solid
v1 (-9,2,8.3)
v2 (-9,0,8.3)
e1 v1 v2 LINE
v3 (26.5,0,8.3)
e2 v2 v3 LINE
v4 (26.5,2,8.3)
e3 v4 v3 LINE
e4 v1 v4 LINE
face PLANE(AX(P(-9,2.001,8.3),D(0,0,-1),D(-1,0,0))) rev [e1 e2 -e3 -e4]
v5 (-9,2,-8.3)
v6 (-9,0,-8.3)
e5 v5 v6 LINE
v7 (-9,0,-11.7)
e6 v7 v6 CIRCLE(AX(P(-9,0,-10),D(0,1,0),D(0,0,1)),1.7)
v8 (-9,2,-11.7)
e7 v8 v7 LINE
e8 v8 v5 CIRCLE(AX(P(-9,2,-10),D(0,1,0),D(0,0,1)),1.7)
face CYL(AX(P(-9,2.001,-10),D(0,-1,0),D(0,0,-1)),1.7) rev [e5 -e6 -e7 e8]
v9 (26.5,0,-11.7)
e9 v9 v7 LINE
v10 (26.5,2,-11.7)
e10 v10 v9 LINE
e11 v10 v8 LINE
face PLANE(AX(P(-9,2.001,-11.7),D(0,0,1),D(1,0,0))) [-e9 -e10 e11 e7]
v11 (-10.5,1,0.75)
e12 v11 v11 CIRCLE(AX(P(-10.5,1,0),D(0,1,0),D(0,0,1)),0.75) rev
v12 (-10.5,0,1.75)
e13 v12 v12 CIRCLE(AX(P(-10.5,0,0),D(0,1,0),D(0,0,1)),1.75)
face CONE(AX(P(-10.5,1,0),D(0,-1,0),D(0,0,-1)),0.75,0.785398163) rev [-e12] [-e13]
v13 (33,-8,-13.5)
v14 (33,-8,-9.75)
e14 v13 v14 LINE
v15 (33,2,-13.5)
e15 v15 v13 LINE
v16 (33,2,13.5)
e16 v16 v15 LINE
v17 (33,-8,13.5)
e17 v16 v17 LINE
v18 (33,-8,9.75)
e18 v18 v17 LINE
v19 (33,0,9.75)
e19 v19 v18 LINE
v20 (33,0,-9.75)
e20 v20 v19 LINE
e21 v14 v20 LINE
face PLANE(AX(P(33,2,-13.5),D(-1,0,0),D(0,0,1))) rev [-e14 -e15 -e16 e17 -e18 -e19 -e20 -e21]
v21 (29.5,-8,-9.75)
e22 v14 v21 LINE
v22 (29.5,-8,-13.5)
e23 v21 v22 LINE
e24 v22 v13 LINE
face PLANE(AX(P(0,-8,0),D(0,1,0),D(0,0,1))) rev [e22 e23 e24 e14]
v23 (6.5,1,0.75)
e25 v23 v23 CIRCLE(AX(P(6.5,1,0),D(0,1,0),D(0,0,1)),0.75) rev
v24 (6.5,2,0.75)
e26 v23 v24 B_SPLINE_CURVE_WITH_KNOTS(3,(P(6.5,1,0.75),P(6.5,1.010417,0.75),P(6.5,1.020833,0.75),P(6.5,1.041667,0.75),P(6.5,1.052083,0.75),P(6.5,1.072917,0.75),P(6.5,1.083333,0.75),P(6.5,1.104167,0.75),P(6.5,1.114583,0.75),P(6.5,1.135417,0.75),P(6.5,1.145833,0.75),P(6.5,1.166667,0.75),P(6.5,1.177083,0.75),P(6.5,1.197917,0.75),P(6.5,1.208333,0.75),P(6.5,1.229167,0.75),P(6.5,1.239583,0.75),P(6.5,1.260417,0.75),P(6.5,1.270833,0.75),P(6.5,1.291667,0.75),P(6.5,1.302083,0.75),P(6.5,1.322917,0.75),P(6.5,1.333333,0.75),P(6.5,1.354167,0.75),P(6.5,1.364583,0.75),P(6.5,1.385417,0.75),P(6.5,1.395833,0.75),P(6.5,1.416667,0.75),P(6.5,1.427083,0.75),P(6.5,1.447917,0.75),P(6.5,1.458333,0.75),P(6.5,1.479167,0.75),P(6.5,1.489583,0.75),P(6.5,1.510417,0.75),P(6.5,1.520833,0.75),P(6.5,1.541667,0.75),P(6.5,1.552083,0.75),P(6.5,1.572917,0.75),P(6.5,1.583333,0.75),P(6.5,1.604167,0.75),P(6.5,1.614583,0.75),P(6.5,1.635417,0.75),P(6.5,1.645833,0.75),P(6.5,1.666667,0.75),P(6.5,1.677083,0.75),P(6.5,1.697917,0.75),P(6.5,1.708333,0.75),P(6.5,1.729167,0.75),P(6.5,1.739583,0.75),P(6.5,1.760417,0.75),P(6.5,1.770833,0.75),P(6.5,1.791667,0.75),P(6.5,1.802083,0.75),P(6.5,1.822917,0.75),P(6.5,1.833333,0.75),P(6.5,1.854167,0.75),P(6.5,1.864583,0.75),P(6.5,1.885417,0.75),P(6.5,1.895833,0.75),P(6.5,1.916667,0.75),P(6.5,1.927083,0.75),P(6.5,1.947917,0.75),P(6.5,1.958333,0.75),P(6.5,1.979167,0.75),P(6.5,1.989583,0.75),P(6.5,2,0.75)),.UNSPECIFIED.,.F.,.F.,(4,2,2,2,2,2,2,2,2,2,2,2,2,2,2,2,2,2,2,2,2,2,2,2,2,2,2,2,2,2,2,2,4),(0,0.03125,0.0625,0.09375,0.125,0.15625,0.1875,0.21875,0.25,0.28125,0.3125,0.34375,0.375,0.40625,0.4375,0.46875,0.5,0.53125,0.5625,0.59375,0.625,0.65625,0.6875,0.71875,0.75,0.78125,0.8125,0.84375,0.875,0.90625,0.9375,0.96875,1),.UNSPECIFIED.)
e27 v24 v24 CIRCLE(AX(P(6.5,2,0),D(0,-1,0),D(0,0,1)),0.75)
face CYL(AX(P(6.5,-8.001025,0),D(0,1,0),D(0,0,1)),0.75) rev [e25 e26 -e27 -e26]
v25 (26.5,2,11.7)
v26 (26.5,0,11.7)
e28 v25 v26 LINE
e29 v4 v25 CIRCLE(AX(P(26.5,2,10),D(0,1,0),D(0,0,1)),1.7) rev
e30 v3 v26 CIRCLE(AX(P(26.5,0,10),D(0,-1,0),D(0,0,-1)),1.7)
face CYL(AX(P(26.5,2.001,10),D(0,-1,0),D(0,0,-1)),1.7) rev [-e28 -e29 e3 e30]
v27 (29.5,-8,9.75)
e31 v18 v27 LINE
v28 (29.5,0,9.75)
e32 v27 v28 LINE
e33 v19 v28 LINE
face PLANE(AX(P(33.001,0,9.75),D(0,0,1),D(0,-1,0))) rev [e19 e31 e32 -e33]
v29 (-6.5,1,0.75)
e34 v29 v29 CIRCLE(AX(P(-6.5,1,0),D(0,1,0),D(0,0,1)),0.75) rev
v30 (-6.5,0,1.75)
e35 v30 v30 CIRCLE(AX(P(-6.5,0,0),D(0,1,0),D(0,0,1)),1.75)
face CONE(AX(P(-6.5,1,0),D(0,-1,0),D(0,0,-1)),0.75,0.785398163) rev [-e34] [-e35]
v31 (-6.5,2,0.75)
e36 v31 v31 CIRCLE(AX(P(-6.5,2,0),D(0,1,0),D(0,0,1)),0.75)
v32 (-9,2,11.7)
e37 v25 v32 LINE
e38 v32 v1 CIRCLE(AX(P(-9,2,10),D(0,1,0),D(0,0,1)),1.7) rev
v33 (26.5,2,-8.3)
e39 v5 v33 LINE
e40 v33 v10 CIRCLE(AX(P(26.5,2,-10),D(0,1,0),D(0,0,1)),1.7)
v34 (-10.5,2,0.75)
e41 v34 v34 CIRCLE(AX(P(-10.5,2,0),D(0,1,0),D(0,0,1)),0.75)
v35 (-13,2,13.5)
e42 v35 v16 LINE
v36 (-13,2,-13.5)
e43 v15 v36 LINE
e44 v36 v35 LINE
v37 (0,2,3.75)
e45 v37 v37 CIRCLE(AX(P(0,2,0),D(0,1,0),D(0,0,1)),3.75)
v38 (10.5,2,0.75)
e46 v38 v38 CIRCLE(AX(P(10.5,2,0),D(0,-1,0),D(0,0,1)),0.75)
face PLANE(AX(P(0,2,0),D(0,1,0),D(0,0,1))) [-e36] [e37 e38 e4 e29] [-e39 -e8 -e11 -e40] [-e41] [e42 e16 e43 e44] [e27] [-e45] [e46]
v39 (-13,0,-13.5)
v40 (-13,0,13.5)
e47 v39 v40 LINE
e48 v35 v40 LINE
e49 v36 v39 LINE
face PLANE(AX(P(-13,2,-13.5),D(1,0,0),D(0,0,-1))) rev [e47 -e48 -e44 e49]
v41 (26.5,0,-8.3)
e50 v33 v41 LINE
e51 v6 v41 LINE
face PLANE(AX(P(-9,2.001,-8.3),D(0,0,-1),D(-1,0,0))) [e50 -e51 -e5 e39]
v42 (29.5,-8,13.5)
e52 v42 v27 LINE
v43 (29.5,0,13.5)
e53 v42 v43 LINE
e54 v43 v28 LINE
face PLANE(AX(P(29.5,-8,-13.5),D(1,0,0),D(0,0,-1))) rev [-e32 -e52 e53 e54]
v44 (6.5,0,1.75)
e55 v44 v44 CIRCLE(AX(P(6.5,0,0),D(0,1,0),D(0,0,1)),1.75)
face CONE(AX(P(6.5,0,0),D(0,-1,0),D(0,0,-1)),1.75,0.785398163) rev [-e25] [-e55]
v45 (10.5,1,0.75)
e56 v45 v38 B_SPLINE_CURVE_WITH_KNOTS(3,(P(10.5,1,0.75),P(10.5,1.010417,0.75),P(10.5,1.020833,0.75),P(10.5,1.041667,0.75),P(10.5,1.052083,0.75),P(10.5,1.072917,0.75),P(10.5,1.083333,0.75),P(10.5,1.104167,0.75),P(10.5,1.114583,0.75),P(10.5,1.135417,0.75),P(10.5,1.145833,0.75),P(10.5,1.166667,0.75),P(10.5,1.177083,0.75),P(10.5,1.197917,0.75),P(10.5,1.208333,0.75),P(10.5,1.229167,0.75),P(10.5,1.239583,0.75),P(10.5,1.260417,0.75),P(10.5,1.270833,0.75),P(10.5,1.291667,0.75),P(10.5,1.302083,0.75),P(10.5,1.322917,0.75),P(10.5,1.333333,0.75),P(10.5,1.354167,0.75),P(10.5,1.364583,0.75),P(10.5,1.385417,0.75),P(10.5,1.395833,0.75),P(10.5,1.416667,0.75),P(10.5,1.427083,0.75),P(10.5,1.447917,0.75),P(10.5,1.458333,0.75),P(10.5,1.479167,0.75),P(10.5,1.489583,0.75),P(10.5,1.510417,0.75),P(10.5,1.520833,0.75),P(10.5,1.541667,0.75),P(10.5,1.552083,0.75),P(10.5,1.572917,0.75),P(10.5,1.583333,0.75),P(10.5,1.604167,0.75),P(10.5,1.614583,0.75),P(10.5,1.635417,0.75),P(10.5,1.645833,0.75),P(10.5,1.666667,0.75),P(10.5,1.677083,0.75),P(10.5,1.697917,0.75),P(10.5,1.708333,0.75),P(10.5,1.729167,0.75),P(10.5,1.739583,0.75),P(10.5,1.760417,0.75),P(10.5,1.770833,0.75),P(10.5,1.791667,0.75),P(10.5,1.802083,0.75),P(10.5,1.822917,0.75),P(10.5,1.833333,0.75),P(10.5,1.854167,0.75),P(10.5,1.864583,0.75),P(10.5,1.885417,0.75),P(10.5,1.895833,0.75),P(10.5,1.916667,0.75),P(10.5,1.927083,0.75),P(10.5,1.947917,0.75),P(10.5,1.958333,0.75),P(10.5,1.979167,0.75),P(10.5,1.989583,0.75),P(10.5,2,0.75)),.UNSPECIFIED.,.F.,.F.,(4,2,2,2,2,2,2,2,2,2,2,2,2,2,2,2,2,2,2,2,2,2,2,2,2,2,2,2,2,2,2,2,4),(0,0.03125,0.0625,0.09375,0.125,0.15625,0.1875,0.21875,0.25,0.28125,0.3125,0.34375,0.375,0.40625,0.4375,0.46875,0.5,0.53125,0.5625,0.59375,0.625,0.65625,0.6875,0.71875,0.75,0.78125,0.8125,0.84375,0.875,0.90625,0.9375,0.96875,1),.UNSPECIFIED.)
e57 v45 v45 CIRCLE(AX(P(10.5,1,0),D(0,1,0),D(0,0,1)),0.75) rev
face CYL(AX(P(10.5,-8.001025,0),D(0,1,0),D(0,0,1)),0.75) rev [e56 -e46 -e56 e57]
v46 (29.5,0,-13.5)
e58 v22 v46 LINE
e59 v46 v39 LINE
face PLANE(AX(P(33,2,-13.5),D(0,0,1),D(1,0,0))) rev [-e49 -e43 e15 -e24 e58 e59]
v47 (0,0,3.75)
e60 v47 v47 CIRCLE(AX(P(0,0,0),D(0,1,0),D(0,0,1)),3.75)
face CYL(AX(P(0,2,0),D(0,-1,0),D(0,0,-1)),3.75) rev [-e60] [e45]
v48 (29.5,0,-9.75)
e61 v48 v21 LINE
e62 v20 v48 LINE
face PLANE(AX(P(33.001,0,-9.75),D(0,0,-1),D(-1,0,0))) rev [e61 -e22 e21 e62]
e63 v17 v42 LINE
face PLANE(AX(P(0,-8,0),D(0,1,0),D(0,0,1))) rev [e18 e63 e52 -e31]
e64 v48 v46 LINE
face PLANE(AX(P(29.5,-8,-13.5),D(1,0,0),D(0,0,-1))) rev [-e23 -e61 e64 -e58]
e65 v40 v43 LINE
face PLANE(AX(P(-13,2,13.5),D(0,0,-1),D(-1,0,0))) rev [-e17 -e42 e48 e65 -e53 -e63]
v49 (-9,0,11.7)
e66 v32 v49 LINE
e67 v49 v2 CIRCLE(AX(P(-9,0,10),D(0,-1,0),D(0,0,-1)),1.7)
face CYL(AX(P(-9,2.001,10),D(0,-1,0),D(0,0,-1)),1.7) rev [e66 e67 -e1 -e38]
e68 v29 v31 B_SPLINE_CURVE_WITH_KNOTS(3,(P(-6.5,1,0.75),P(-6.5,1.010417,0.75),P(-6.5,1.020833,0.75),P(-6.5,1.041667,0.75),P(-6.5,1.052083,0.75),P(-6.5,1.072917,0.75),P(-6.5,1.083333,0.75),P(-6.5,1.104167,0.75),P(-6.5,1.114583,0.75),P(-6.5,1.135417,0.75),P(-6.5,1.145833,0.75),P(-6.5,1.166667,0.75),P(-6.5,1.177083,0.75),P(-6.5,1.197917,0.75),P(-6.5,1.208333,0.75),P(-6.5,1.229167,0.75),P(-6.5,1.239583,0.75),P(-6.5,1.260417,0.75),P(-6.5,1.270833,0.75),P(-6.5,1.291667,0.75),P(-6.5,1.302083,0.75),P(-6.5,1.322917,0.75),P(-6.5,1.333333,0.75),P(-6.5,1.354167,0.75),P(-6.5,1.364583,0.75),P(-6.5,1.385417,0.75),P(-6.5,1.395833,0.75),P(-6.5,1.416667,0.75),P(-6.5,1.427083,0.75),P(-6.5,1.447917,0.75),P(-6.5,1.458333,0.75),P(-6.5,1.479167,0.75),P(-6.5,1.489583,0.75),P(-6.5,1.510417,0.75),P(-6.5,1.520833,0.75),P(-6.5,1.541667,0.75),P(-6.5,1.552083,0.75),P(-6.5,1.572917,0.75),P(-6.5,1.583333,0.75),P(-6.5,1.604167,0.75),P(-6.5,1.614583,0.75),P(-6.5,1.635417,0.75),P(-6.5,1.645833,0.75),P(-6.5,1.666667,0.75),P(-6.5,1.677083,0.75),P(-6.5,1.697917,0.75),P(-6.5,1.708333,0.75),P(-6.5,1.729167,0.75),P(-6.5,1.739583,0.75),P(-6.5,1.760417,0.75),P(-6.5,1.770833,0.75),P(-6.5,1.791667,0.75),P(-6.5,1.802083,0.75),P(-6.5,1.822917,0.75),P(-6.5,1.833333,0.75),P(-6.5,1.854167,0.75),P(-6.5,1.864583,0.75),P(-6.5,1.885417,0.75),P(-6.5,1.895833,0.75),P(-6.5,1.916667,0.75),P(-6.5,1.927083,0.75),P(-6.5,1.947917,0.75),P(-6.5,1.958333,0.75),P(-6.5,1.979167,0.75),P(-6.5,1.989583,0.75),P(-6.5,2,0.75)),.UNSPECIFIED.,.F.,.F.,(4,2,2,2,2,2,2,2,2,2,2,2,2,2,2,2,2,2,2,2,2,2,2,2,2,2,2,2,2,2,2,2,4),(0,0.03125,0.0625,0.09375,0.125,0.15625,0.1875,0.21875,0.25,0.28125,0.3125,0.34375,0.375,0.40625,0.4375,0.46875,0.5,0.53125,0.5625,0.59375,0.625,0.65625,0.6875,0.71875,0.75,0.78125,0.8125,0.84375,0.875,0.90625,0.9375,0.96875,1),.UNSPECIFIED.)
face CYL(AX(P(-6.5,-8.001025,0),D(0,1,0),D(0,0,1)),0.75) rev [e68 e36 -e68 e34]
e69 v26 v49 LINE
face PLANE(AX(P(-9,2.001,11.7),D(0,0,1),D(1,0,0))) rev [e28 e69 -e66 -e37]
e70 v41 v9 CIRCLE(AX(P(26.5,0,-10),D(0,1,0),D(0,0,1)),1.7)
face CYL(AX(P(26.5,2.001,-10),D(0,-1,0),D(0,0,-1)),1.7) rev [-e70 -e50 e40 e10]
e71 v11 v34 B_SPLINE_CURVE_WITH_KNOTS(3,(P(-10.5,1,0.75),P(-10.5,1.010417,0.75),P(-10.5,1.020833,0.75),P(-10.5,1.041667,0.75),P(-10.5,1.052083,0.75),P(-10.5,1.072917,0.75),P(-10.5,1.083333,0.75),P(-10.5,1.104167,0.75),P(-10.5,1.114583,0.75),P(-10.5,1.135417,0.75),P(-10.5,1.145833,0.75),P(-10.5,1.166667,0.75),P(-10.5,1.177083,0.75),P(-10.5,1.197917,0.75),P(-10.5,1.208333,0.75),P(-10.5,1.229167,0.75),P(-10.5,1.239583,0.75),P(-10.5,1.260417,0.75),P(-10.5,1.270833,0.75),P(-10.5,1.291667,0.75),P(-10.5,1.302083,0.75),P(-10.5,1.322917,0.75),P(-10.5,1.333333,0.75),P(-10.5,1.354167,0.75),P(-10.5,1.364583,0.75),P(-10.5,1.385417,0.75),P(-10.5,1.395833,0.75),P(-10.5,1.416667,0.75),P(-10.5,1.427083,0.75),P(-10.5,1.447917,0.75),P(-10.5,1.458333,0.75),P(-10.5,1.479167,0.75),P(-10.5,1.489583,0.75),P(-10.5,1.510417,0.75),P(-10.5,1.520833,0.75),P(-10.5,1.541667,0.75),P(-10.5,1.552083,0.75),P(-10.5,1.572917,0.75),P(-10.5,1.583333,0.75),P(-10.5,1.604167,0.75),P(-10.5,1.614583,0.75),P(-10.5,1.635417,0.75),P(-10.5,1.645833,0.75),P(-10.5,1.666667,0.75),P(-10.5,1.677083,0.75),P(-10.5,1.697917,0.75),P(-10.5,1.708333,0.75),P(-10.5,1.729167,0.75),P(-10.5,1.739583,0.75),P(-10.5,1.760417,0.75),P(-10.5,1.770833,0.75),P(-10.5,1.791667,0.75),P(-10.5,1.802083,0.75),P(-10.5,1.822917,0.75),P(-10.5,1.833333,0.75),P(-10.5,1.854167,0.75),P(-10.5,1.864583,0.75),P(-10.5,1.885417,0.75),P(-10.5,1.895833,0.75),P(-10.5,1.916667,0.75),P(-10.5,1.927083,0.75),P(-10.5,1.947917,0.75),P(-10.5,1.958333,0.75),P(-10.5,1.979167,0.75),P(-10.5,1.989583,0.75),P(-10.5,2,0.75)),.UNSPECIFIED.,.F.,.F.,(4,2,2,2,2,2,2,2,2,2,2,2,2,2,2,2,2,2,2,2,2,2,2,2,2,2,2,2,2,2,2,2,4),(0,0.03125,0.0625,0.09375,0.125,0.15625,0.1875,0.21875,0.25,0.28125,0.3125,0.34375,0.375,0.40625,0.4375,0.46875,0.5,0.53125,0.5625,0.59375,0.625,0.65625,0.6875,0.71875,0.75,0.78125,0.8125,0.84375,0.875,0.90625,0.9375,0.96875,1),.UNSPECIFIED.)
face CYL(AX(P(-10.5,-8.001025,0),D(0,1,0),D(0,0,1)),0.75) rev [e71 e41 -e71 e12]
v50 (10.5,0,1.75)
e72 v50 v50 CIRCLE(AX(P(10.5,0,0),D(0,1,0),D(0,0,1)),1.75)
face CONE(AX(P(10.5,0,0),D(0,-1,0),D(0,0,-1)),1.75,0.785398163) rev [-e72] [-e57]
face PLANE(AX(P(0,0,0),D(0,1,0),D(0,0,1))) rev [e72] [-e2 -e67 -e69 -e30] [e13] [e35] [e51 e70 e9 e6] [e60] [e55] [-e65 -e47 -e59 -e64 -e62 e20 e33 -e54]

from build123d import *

# Parameters (mm, degrees)
SKETCH1_W                  = 46
SKETCH1_H                  = 27
SKETCH1_R                  = 3.75
BOSS_EXTRUDE1_DEPTH        = 2
SKETCH7_W                  = 3.5
SKETCH7_H                  = 27
BOSS_EXTRUDE4_DEPTH        = 8
CUT_EXTRUDE3_REACH         = 47.305
SKETCH8_W                  = 19.5
SKETCH8_H                  = 8
CUT_EXTRUDE4_REACH         = 38.541
CUT_EXTRUDE5_REACH         = 39.03
SKETCH10_R                 = 0.75
CHAMFER1_SIZE              = 1
LPATTERN1_COUNT            = 2
LPATTERN1_PITCH            = 4
CHAMFER1_OF_LPATTERN1_SIZE = 1


# Read off the part's stored shape, not the designer's step: Mirror2
with BuildPart() as part:
    # Sketch1 → Boss-Extrude1 (new body)
    with BuildSketch(Plane(origin=(0, 0, 0), x_dir=(1, 0, 0), z_dir=(0, 1, 0))):
        with Locations((10, 0)):
            Rectangle(SKETCH1_W, SKETCH1_H)
        with Locations(Location((0, 0, 0), (0, 0, 270))):
            Circle(SKETCH1_R, mode=Mode.SUBTRACT)
    extrude(amount=BOSS_EXTRUDE1_DEPTH)

    # Sketch7 → Boss-Extrude4 (add)
    with BuildSketch(Plane.XZ):
        with Locations((31.25, 0)):
            Rectangle(SKETCH7_W, SKETCH7_H)
    extrude(amount=BOSS_EXTRUDE4_DEPTH)

    # Sketch8 → Cut-Extrude3 (cut, up to next)
    with BuildSketch(Plane.ZY.offset(-29.5), mode=Mode.PRIVATE) as cut_extrude3_sk1:
        with Locations((0, -4)):
            Rectangle(SKETCH8_W, SKETCH8_H)
    cut_extrude3_tool1 = extrude(cut_extrude3_sk1.sketch, amount=-CUT_EXTRUDE3_REACH, mode=Mode.PRIVATE) & part.part
    add(cut_extrude3_tool1.solids().sort_by_distance((29.5, -4, 0))[0], mode=Mode.SUBTRACT)

    # Sketch9 → Cut-Extrude4 (cut, up to next)
    with BuildSketch(Plane.XZ, mode=Mode.PRIVATE) as cut_extrude4_sk1:
        with BuildLine():
            Line((-9, 11.7), (26.5, 11.7))
            ThreePointArc((26.5, 11.7), (28.2, 10), (26.5, 8.3))
            Line((26.5, 8.3), (-9, 8.3))
            ThreePointArc((-9, 8.3), (-10.7, 10), (-9, 11.7))
        make_face()
    cut_extrude4_tool1 = extrude(cut_extrude4_sk1.sketch, amount=-CUT_EXTRUDE4_REACH, mode=Mode.PRIVATE) & part.part
    cut_extrude4 = cut_extrude4_tool1.solids().sort_by_distance((8.75, 0, 10))[0]
    add(cut_extrude4, mode=Mode.SUBTRACT)

    # Mirror1: Cut-Extrude4 across plane
    add(cut_extrude4.mirror(Plane.XY), mode=Mode.SUBTRACT)

    # Sketch10 → Cut-Extrude5 (cut, up to next)
    with BuildSketch(Plane(origin=(0, 2, 0), x_dir=(1, 0, 0), z_dir=(0, 1, 0)), mode=Mode.PRIVATE) as cut_extrude5_sk1:
        with Locations(Location((-6.5, 0, 0), (0, 0, 270))):
            Circle(SKETCH10_R)
    cut_extrude5_tool1 = extrude(cut_extrude5_sk1.sketch, amount=-CUT_EXTRUDE5_REACH, mode=Mode.PRIVATE) & part.part
    cut_extrude5 = cut_extrude5_tool1.solids().sort_by_distance((-6.5, 2, 0))[0]
    add(cut_extrude5, mode=Mode.SUBTRACT)

    # Chamfer1
    chamfer1_edges = [part.edges().sort_by_distance(p)[0] for p in [
        (-6.5, 0, -0.75),
    ]]
    chamfer(chamfer1_edges, length=CHAMFER1_SIZE)

    # LPattern1: Cut-Extrude5 ×2
    with Locations(*[(-i * LPATTERN1_PITCH, 0, 0) for i in range(1, LPATTERN1_COUNT)]):
        add(cut_extrude5, mode=Mode.SUBTRACT)

    # Chamfer1 of LPattern1
    chamfer1_of_lpattern1_edges = [part.edges().sort_by_distance(p)[0] for p in [
        (-10.5, 0, -0.75),
    ]]
    chamfer(chamfer1_of_lpattern1_edges, length=CHAMFER1_OF_LPATTERN1_SIZE)

    # Mirror2 outline → Mirror2 (revolve, cut)
    with BuildSketch(Plane(origin=(6.5, 0, 0), x_dir=(1, 0, 0), z_dir=(0, 0, 1))):
        Polygon((0, 0), (1.75, 0), (0.75, 1), (0.75, 2), (0, 2), align=None)
    revolve(axis=Axis((6.5, 0, 0), (0, 1, 0)), mode=Mode.SUBTRACT)

    # Mirror2 2 outline → Mirror2 2 (revolve, cut)
    with BuildSketch(Plane(origin=(10.5, 0, 0), x_dir=(1, 0, 0), z_dir=(0, 0, 1))):
        Polygon((0, 0), (1.75, 0), (0.75, 1), (0.75, 2), (0, 2), align=None)
    revolve(axis=Axis((10.5, 0, 0), (0, 1, 0)), mode=Mode.SUBTRACT)


solid = part.part
